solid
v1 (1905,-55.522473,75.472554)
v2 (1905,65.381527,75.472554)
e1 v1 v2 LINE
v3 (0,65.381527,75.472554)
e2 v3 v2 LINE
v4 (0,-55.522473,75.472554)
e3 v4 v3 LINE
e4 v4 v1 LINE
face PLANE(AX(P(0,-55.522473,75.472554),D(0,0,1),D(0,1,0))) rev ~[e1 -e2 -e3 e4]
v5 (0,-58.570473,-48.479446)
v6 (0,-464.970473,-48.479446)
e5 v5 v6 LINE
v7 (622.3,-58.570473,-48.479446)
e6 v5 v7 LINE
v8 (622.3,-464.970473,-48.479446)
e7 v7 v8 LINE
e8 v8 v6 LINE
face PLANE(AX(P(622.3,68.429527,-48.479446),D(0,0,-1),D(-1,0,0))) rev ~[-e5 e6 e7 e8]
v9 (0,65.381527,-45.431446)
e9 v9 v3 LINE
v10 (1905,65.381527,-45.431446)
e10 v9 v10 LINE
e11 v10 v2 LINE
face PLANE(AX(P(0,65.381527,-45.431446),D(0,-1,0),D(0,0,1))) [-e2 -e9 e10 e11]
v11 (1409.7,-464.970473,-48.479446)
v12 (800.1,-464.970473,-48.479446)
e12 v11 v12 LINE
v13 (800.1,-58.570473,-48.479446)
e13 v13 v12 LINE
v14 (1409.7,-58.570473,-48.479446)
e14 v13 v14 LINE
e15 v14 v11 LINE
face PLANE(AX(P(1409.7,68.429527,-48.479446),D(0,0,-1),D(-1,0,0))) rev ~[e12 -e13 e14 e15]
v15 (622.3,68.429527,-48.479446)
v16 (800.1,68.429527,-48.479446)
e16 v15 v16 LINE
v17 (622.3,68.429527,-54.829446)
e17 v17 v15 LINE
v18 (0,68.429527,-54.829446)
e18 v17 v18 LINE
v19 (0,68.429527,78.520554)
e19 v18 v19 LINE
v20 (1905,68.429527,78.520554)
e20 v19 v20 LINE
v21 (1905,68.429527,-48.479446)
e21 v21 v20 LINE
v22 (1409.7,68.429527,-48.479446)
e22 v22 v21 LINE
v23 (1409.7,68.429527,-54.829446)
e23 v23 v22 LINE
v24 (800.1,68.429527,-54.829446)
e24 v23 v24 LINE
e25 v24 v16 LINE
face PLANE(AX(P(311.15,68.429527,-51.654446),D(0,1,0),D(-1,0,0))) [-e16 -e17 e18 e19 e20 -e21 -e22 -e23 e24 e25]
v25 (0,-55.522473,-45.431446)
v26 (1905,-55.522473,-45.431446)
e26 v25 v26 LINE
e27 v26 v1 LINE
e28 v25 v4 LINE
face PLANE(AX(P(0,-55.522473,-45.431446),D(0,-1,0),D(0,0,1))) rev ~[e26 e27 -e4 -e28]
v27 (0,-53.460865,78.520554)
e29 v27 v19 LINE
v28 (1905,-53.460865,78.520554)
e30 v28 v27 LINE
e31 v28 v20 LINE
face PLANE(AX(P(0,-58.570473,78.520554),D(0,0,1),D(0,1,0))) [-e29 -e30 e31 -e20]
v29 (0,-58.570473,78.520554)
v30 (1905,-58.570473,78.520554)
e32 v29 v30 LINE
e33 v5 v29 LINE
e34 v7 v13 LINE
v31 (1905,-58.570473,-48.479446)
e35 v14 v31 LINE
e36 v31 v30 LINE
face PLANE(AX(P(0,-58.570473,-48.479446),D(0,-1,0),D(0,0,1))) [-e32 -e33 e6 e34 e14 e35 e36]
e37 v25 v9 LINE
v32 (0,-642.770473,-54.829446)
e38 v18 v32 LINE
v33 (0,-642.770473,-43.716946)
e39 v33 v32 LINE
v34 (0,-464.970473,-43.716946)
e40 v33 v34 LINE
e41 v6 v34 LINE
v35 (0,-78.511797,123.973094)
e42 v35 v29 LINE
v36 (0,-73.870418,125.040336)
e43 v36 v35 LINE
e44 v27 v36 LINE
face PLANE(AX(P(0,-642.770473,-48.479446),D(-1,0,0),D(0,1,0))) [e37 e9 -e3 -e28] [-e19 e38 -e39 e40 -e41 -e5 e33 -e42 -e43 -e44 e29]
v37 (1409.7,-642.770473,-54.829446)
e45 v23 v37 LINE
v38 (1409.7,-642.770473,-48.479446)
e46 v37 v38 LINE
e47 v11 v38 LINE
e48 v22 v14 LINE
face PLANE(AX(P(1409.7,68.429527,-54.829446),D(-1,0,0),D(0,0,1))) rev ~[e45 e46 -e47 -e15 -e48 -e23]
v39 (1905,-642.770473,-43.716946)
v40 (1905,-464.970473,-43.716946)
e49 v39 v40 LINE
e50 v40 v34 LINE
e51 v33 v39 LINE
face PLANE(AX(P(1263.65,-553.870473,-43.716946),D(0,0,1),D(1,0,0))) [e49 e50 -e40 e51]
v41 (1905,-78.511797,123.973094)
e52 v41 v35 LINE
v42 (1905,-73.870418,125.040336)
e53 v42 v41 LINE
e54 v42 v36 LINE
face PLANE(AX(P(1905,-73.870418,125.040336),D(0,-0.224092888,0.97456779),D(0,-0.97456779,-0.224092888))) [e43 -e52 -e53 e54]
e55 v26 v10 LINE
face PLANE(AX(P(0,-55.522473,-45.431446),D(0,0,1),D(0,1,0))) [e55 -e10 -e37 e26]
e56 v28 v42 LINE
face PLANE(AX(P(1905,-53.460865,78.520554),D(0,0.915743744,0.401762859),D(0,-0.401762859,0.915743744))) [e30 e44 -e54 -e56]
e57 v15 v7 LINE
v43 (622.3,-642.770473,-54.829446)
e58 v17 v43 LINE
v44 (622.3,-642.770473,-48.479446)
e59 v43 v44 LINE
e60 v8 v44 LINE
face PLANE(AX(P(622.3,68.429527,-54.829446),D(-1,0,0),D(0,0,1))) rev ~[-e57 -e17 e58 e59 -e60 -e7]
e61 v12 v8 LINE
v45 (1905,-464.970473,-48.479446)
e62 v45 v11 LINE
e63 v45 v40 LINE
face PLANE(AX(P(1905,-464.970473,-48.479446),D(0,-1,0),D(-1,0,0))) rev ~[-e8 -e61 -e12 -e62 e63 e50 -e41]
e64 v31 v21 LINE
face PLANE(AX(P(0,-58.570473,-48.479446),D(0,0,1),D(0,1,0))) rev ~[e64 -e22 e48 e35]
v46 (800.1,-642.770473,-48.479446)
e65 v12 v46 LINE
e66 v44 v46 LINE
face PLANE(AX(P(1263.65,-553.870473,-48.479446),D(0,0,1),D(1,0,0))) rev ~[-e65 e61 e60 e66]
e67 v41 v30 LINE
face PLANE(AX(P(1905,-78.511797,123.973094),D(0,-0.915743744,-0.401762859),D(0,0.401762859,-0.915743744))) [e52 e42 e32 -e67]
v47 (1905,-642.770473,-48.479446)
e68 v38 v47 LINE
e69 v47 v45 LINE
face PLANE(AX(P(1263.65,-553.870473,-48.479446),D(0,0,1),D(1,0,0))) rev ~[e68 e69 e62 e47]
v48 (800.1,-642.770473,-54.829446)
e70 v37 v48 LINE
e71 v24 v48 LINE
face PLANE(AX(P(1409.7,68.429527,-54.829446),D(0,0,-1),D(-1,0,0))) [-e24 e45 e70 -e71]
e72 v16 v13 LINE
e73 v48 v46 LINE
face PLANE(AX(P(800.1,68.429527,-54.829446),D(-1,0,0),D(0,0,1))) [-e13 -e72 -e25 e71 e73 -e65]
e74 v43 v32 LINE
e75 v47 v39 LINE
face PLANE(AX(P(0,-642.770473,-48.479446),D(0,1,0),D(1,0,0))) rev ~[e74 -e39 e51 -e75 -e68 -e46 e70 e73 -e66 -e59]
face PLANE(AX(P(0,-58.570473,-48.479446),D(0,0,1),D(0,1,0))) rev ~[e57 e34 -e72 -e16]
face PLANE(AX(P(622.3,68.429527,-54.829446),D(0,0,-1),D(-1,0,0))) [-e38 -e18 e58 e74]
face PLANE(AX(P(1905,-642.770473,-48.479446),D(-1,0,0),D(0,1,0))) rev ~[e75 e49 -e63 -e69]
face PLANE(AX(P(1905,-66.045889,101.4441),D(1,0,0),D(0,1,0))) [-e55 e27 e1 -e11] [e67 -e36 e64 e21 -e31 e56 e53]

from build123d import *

# Parameters (mm, degrees)
F0_W     = 127
F0_H     = 127
F0_W_2   = 120.904
F0_H_2   = 120.904
F1_DEPTH = 1905
F3_DEPTH = 1905
F4_W     = 622.3
F4_H     = 6.35
F4_W_2   = 609.6
F5_DEPTH = 711.2
F6_W     = 1282.7
F6_H     = 177.8
F6_W_2   = 622.3
F7_DEPTH = 4.7625


with BuildPart() as f1:
    # F0 (on Right) → F1 (new body)
    with BuildSketch(Plane.YZ):
        with Locations((4.929526709, 15.0205540939)):
            Rectangle(F0_W, F0_H)
        with Locations((4.929526709, 15.0205540939)):
            Rectangle(F0_W_2, F0_H_2, mode=Mode.SUBTRACT)
    extrude(amount=F1_DEPTH)

    # F2 (on face) → F3 (join)
    with BuildSketch(Plane.YZ.offset(1905)):
        Polygon((-78.5117968917, 123.9730939269), (-58.570473291, 78.5205540939), (-53.4608645662, 78.5205540939), (-73.8704177914, 125.0403363069), align=None)
    extrude(amount=-F3_DEPTH)

    # F4 (on face) → F5 (join)
    with BuildSketch(Plane(origin=(0, 68.429526709, 0), x_dir=(-1, 0, 0), z_dir=(0, 1, 0))):
        with Locations((-311.15, -51.6544459061)):
            Rectangle(F4_W, F4_H)
        with Locations((-1104.9, -51.6544459061)):
            Rectangle(F4_W_2, F4_H)
    extrude(amount=-F5_DEPTH)

    # F6 (on face) → F7 (join)
    with BuildSketch(Plane.XY.offset(-48.4794459061)):
        with Locations((1263.65, -553.870473291)):
            Rectangle(F6_W, F6_H)
        with Locations((311.15, -553.870473291)):
            Rectangle(F6_W_2, F6_H)
    extrude(amount=F7_DEPTH)


solid = f1.part
